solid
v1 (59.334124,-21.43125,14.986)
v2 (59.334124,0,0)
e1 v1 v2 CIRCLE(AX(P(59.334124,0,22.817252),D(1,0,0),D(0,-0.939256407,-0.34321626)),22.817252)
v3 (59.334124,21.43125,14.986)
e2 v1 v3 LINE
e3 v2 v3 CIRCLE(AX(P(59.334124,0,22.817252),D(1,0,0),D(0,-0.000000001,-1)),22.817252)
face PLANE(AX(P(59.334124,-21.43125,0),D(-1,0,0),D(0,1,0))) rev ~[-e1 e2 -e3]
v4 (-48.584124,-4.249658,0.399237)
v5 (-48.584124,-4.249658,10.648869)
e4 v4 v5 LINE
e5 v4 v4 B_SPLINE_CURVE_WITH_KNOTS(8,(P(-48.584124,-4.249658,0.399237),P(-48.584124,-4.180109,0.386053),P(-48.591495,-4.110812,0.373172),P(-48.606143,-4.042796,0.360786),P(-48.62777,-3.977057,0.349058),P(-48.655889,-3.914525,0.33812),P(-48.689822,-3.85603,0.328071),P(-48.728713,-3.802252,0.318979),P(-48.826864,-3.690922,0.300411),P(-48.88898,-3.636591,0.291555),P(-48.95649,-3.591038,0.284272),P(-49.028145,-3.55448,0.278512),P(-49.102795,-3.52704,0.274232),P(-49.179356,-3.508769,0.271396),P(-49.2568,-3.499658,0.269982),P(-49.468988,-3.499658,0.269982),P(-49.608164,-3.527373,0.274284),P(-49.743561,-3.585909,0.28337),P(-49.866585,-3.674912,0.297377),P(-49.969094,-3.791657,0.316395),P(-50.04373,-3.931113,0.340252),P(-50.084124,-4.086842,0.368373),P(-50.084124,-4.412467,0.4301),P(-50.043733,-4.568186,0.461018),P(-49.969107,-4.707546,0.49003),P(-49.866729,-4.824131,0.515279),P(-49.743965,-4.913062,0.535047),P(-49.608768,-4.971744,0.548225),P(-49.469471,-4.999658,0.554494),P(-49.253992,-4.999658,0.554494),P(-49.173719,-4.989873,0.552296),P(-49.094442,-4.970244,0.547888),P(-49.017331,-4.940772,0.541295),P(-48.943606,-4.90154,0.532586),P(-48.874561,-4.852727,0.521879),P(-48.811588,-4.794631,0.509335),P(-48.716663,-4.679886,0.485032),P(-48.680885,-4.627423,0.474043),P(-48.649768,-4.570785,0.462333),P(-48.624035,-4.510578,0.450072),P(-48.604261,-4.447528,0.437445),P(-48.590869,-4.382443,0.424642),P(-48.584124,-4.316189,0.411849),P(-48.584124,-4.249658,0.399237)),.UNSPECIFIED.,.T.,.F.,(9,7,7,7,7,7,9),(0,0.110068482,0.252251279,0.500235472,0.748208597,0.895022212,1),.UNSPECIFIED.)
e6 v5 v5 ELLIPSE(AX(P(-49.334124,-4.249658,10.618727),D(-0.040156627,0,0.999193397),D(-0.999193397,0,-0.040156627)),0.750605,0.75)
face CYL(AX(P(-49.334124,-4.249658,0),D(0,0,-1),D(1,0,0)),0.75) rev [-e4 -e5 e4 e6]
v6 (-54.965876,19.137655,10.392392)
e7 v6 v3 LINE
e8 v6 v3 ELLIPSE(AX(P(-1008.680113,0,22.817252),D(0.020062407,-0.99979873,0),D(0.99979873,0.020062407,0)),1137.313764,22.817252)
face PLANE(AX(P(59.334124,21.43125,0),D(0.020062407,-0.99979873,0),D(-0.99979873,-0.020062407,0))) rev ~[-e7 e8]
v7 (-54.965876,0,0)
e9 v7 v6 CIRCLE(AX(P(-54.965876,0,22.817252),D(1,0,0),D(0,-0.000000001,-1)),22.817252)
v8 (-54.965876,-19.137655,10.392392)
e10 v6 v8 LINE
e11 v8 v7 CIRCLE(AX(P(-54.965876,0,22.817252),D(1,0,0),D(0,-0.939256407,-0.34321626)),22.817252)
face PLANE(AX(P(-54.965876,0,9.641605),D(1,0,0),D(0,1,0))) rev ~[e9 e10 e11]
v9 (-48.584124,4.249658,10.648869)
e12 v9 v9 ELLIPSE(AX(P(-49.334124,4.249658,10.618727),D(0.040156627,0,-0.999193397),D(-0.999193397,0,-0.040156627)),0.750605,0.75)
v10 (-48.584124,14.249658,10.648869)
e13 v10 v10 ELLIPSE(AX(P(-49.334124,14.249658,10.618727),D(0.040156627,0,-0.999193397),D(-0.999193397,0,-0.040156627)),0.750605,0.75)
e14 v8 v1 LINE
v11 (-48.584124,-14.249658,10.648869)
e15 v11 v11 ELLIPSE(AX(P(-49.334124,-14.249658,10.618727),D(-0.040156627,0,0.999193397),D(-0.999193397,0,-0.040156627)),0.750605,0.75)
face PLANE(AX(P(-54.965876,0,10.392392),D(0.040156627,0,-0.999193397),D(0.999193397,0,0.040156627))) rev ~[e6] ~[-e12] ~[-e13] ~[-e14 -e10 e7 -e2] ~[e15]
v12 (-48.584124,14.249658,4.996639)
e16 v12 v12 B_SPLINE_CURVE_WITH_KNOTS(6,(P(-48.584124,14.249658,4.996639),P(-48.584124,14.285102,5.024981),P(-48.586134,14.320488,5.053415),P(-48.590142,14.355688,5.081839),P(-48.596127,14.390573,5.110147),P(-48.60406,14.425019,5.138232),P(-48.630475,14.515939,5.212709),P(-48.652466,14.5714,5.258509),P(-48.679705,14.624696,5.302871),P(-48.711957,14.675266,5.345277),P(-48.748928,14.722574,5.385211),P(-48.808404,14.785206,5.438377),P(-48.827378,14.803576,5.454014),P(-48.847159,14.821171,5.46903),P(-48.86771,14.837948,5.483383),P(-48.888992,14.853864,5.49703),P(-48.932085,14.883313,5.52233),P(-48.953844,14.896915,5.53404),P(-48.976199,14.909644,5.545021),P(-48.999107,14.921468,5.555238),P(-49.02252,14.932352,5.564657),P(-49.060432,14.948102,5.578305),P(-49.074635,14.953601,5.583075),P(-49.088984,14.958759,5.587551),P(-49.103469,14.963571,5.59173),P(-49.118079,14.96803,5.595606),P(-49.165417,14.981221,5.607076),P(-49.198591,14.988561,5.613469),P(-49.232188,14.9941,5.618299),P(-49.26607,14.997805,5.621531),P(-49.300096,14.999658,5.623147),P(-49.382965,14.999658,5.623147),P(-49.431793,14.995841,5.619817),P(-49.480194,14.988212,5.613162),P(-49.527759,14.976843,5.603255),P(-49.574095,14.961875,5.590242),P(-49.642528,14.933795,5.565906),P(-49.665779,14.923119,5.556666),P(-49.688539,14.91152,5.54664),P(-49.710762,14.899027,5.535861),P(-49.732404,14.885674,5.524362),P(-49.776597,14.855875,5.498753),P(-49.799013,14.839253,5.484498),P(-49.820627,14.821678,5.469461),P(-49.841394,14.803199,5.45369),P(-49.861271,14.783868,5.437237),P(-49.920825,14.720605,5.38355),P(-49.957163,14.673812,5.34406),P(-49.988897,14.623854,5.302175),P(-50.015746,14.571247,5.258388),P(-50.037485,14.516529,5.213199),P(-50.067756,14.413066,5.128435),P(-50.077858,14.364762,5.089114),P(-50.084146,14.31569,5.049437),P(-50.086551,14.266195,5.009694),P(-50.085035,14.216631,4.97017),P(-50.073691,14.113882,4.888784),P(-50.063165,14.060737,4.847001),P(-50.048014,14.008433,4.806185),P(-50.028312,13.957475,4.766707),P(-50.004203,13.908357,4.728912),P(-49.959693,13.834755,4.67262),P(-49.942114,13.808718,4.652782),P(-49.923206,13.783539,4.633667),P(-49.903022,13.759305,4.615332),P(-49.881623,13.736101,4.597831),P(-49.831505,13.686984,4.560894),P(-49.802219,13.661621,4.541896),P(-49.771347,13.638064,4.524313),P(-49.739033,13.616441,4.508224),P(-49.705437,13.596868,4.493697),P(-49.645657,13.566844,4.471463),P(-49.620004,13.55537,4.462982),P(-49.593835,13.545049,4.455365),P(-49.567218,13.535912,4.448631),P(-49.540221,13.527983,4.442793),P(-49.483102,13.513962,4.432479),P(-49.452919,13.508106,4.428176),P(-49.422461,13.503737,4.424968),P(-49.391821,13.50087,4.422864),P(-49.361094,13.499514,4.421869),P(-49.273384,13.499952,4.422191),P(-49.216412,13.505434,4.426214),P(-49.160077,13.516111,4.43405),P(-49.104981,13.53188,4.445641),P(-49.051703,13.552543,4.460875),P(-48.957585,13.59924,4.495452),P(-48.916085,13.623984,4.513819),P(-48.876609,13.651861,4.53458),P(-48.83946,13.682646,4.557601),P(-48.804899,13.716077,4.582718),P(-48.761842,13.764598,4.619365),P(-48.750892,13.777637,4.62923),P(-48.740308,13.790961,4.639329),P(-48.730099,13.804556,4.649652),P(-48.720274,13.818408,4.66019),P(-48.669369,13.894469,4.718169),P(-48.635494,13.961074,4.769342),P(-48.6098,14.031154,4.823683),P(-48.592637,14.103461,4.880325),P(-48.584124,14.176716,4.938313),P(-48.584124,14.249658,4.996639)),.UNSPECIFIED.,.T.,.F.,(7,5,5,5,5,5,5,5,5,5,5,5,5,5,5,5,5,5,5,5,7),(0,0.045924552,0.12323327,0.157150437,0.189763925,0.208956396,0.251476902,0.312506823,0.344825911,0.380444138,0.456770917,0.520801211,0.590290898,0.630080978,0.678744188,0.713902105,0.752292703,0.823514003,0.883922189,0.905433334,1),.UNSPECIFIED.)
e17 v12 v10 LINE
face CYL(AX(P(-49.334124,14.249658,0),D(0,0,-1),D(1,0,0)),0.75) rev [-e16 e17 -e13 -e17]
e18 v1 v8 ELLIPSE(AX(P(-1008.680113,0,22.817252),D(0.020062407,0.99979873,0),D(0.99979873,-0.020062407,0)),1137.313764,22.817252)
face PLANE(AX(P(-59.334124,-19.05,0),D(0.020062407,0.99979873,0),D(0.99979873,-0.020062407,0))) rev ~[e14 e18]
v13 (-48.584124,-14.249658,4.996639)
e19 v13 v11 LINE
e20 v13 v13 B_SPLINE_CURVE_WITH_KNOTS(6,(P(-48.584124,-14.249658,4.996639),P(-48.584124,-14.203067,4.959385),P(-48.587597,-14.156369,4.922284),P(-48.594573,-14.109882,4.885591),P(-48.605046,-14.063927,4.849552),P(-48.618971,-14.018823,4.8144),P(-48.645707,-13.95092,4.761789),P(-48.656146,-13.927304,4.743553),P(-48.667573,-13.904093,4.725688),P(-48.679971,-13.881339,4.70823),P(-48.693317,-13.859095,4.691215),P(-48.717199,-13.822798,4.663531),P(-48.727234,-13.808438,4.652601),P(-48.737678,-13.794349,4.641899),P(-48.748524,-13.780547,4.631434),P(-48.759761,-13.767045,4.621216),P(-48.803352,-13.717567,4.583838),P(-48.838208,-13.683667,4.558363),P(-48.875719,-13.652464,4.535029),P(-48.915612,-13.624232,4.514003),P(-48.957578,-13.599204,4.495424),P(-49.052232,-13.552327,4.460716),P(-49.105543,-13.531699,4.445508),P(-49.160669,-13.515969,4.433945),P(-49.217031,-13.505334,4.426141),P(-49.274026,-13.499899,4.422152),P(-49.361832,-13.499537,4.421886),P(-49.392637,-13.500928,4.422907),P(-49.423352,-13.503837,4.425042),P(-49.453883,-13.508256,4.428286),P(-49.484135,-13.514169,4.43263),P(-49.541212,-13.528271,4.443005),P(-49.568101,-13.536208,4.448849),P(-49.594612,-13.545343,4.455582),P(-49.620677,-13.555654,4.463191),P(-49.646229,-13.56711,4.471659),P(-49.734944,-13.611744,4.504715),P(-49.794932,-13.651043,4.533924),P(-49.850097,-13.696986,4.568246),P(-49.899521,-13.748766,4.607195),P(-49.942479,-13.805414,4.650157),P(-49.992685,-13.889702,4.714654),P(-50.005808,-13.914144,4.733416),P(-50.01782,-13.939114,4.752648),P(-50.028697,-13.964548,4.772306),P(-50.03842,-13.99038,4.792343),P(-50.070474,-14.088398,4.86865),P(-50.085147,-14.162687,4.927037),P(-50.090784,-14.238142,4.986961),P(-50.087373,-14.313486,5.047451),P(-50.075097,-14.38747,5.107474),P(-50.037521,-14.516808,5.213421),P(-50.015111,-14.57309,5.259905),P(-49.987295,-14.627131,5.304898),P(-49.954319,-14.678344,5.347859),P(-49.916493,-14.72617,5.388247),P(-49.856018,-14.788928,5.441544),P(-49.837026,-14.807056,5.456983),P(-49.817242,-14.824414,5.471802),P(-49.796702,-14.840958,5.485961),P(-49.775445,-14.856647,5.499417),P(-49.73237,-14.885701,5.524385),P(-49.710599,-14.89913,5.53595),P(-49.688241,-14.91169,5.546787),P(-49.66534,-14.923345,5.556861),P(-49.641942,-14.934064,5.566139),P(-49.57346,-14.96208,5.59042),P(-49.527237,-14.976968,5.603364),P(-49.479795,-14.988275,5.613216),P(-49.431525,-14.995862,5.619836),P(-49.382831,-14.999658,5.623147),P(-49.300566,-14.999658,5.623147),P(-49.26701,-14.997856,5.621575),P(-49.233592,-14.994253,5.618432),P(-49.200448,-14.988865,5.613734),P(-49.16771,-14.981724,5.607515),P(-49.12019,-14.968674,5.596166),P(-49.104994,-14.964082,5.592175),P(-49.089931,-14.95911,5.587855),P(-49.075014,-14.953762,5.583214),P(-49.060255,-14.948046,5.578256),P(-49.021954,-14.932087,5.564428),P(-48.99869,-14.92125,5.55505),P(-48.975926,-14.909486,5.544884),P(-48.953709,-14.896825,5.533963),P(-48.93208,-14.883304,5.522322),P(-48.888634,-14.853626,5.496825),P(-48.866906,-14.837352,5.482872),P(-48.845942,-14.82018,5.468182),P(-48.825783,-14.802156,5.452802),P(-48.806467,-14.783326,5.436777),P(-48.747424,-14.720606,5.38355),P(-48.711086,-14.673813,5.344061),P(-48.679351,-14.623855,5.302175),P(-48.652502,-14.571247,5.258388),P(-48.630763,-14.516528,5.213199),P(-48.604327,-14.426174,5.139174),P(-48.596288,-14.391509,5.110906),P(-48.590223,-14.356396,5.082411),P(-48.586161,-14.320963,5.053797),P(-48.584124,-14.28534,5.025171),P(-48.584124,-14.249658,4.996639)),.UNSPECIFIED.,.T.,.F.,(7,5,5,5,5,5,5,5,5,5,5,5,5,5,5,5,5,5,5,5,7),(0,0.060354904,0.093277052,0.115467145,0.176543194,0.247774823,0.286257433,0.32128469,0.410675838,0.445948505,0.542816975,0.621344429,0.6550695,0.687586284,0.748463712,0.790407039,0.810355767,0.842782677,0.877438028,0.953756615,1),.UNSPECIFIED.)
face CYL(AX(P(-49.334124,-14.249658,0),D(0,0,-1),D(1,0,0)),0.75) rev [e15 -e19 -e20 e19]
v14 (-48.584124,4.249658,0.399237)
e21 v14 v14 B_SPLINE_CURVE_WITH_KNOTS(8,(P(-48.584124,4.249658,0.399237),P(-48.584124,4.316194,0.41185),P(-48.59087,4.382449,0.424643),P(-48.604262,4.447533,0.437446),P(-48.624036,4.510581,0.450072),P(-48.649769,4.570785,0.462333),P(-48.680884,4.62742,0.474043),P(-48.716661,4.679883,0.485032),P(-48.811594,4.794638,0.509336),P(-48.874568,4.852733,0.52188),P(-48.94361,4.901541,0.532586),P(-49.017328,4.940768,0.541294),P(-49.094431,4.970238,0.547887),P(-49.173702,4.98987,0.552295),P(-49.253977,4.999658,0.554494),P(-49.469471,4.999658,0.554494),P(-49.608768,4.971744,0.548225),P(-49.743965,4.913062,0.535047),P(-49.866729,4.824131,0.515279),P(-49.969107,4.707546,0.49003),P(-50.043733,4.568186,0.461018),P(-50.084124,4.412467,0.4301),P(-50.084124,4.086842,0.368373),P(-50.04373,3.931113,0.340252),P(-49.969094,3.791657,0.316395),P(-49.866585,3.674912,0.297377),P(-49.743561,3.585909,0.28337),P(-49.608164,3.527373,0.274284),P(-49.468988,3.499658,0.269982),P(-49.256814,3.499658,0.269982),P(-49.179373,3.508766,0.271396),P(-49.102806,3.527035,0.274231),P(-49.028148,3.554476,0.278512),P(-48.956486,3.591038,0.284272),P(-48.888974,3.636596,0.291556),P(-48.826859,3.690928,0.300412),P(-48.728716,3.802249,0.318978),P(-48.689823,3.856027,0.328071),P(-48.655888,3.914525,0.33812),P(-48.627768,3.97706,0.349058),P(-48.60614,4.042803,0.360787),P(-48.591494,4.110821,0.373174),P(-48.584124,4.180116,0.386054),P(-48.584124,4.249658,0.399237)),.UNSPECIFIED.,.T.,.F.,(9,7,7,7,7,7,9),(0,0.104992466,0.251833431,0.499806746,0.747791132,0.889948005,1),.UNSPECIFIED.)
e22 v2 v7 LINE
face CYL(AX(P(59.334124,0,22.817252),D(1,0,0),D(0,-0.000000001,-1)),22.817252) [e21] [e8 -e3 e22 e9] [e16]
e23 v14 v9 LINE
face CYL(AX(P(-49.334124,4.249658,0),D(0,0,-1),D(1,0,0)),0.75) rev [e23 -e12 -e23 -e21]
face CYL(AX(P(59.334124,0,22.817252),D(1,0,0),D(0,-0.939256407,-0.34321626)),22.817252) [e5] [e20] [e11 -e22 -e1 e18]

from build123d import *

# Parameters (mm, degrees)
F0_R          = 0.75
F1_DEPTH      = 14.986
F3_DEPTH      = 114.3
F5_DEPTH      = 25.4
F5_DEPTH_BACK = 25.4


# Not quite as in the source:
# - a feature names something its author has since deleted; it is built from what else it names


with BuildPart() as f1:
    # F0 (on Top) → F1 (new body)
    with BuildSketch(Plane.XY):
        Polygon((59.3341242821, 21.43125), (-59.3341242821, 19.05), (-59.3341242821, -19.05), (59.3341242821, -21.43125), align=None)
        with Locations((-49.3341242821, -14.2496579055)):
            Circle(F0_R, mode=Mode.SUBTRACT)
        with Locations((-49.3341242821, -4.2496579055)):
            Circle(F0_R, mode=Mode.SUBTRACT)
        with Locations((-49.3341242821, 4.2496579055)):
            Circle(F0_R, mode=Mode.SUBTRACT)
        with Locations((-49.3341242821, 14.2496579055)):
            Circle(F0_R, mode=Mode.SUBTRACT)
    extrude(amount=F1_DEPTH)

    # F2 (on face) → F3 (intersect)
    with BuildSketch(Plane.YZ.offset(59.3341242821)):
        with BuildLine():
            Line((21.43125, 14.986), (-21.43125, 14.986))
            ThreePointArc((-21.43125, 14.986), (-13.0755370179, 4.1181258353), (-1.54e-08, 0))
            ThreePointArc((-1.54e-08, 0), (13.0755370052, 4.1181258265), (21.43125, 14.986))
        make_face()
    extrude(amount=-F3_DEPTH, mode=Mode.INTERSECT)

    # F4 (on Front) → F5 (cut, two sides)
    with BuildSketch(Plane.XZ) as f5_sk:
        Polygon((-54.9658757179, 14.986), (-54.9658757179, 10.3923923096), (59.3341242821, 14.986), align=None)
    extrude(amount=-F5_DEPTH, mode=Mode.SUBTRACT)
    extrude(f5_sk.sketch, amount=F5_DEPTH_BACK, mode=Mode.SUBTRACT)


solid = f1.part
